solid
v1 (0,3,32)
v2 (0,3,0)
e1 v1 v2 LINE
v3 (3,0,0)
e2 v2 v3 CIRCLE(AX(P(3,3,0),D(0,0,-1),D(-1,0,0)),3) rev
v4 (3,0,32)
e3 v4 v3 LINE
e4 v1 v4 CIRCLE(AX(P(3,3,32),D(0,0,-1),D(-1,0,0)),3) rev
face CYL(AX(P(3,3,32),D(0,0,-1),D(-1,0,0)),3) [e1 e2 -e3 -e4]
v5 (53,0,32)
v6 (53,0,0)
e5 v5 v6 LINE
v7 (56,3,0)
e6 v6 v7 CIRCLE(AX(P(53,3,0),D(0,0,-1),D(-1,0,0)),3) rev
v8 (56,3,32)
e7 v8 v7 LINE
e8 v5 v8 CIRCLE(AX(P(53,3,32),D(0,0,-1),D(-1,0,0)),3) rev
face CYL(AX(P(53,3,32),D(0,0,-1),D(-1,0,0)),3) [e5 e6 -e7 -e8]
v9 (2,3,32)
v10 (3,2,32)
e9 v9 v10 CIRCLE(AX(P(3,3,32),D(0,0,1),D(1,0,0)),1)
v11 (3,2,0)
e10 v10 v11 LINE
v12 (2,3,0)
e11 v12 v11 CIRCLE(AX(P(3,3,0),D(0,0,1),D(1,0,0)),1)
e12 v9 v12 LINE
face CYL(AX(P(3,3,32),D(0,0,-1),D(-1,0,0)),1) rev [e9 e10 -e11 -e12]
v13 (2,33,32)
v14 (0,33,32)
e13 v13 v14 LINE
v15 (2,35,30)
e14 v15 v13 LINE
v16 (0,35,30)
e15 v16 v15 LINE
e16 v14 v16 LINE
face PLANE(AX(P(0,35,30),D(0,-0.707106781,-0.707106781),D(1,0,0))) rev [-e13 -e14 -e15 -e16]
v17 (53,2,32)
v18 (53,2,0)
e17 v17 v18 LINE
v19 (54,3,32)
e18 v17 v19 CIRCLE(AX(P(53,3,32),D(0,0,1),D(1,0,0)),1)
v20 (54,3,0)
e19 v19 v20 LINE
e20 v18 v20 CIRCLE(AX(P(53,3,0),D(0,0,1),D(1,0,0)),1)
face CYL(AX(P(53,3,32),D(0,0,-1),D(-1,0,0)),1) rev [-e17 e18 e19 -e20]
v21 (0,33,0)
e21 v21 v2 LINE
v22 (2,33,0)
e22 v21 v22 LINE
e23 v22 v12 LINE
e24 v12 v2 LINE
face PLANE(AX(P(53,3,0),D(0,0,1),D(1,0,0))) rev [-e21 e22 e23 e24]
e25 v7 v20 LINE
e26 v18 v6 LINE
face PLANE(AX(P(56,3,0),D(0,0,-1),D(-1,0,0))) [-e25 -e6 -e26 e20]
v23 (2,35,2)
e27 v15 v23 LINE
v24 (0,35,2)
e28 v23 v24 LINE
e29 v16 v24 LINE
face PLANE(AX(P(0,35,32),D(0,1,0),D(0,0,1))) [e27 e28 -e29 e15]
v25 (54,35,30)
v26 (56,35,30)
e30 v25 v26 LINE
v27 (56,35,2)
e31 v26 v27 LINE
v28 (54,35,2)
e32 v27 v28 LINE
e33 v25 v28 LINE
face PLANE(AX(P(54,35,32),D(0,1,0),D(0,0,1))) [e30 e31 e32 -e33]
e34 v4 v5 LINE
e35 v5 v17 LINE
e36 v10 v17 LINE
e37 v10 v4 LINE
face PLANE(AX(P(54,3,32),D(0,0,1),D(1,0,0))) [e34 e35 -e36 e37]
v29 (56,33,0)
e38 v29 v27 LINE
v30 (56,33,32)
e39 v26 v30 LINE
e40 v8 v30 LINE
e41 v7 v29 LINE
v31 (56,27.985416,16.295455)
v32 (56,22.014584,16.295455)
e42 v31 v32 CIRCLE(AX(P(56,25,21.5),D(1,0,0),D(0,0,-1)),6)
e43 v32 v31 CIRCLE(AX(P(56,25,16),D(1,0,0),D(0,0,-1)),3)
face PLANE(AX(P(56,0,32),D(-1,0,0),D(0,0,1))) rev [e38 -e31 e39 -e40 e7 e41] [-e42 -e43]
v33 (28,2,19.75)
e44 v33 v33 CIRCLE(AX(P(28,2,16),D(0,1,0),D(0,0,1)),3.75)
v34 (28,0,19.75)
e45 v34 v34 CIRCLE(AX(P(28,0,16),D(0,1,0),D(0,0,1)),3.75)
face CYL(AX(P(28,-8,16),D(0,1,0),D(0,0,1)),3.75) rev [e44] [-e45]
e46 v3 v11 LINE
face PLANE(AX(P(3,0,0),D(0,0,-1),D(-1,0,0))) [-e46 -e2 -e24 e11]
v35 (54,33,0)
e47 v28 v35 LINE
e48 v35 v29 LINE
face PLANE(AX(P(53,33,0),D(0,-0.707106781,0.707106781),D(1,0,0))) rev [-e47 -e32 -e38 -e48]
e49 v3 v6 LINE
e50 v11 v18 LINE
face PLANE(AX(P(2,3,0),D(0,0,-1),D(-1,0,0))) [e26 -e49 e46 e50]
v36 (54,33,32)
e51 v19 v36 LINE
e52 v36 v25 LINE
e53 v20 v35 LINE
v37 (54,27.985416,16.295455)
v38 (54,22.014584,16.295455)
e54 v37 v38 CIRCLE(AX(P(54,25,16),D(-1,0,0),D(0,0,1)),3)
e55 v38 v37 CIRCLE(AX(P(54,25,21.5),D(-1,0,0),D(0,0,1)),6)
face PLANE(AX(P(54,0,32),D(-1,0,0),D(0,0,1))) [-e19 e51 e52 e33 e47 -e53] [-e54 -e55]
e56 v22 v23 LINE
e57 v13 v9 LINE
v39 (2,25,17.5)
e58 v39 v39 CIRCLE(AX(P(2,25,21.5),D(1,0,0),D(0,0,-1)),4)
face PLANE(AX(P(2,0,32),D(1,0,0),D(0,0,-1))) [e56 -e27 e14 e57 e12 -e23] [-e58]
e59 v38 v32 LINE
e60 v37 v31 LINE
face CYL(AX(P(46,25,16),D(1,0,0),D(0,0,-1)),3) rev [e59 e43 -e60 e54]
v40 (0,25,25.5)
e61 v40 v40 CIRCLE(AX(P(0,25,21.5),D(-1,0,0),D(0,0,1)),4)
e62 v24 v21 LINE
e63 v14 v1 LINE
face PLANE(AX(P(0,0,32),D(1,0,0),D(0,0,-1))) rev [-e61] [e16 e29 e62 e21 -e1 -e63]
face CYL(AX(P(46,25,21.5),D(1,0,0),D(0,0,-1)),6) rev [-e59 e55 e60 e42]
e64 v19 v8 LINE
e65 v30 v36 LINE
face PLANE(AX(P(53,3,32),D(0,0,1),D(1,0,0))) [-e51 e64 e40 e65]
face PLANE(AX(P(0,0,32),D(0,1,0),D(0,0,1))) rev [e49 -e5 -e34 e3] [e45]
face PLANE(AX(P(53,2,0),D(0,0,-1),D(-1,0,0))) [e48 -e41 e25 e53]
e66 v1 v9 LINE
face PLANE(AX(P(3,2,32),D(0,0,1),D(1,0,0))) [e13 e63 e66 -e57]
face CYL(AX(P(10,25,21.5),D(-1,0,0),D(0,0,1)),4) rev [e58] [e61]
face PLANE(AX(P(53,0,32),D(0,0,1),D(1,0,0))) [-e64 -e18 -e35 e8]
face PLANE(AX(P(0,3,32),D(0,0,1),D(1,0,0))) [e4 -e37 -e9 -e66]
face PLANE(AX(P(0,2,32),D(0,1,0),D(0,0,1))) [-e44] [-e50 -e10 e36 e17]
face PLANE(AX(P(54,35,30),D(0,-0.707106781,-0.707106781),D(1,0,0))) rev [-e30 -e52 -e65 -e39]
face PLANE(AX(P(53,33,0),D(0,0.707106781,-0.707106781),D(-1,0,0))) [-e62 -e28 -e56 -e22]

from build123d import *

# Parameters (mm, degrees)
BASE_FLANGE1_DEPTH = 32
CUT_EXTRUDE1_DEPTH = 10
SKETCH7_R          = 4
CUT_EXTRUDE2_DEPTH = 10
SKETCH8_R          = 3.75
CUT_EXTRUDE4_DEPTH = 10
CHAMFER1_SIZE      = 2


# Read off the part's stored shape, not the designer's step: Base-Flange1
with BuildPart() as part:
    # Base-Flange1 outline → Base-Flange1 (new body)
    with BuildSketch(Plane.XY):
        with BuildLine():
            Line((56, 3), (56, 35))
            Line((56, 35), (54, 35))
            Line((54, 35), (54, 3))
            ThreePointArc((54, 3), (53.707106781, 2.292893219), (53, 2))
            Line((53, 2), (3, 2))
            ThreePointArc((3, 2), (2.292893219, 2.292893219), (2, 3))
            Line((2, 3), (2, 35))
            Line((2, 35), (0, 35))
            Line((0, 35), (0, 3))
            ThreePointArc((0, 3), (0.878679656, 0.878679656), (3, 0))
            Line((3, 0), (53, 0))
            ThreePointArc((53, 0), (55.121320344, 0.878679656), (56, 3))
        make_face()
    extrude(amount=BASE_FLANGE1_DEPTH)

    # Sketch6 → Cut-Extrude1 (cut)
    with BuildSketch(Plane(origin=(56, 0, 0), x_dir=(0, 0, -1), z_dir=(1, 0, 0))):
        with BuildLine():
            ThreePointArc((-16.295454545, 27.985415651), (-27.5, 25), (-16.295454545, 22.014584349))
            ThreePointArc((-16.295454545, 22.014584349), (-13, 25), (-16.295454545, 27.985415651))
        make_face()
    extrude(amount=-CUT_EXTRUDE1_DEPTH, mode=Mode.SUBTRACT)

    # Sketch7 → Cut-Extrude2 (cut)
    with BuildSketch(Plane.ZY):
        with Locations((21.5, 25)):
            Circle(SKETCH7_R)
    extrude(amount=-CUT_EXTRUDE2_DEPTH, mode=Mode.SUBTRACT)

    # Sketch8 → Cut-Extrude4 (cut)
    with BuildSketch(Plane(origin=(0, 2, 0), x_dir=(1, 0, 0), z_dir=(0, 1, 0))):
        with Locations(Location((28, -16, 0), (0, 0, 270))):
            Circle(SKETCH8_R)
    extrude(amount=-CUT_EXTRUDE4_DEPTH, mode=Mode.SUBTRACT)

    # Chamfer1
    chamfer1_edges = [part.edges().sort_by_distance(p)[0] for p in [
        (1, 35, 0),
        (55, 35, 0),
        (1, 35, 32),
        (55, 35, 32),
    ]]
    chamfer(chamfer1_edges, length=CHAMFER1_SIZE)


solid = part.part
